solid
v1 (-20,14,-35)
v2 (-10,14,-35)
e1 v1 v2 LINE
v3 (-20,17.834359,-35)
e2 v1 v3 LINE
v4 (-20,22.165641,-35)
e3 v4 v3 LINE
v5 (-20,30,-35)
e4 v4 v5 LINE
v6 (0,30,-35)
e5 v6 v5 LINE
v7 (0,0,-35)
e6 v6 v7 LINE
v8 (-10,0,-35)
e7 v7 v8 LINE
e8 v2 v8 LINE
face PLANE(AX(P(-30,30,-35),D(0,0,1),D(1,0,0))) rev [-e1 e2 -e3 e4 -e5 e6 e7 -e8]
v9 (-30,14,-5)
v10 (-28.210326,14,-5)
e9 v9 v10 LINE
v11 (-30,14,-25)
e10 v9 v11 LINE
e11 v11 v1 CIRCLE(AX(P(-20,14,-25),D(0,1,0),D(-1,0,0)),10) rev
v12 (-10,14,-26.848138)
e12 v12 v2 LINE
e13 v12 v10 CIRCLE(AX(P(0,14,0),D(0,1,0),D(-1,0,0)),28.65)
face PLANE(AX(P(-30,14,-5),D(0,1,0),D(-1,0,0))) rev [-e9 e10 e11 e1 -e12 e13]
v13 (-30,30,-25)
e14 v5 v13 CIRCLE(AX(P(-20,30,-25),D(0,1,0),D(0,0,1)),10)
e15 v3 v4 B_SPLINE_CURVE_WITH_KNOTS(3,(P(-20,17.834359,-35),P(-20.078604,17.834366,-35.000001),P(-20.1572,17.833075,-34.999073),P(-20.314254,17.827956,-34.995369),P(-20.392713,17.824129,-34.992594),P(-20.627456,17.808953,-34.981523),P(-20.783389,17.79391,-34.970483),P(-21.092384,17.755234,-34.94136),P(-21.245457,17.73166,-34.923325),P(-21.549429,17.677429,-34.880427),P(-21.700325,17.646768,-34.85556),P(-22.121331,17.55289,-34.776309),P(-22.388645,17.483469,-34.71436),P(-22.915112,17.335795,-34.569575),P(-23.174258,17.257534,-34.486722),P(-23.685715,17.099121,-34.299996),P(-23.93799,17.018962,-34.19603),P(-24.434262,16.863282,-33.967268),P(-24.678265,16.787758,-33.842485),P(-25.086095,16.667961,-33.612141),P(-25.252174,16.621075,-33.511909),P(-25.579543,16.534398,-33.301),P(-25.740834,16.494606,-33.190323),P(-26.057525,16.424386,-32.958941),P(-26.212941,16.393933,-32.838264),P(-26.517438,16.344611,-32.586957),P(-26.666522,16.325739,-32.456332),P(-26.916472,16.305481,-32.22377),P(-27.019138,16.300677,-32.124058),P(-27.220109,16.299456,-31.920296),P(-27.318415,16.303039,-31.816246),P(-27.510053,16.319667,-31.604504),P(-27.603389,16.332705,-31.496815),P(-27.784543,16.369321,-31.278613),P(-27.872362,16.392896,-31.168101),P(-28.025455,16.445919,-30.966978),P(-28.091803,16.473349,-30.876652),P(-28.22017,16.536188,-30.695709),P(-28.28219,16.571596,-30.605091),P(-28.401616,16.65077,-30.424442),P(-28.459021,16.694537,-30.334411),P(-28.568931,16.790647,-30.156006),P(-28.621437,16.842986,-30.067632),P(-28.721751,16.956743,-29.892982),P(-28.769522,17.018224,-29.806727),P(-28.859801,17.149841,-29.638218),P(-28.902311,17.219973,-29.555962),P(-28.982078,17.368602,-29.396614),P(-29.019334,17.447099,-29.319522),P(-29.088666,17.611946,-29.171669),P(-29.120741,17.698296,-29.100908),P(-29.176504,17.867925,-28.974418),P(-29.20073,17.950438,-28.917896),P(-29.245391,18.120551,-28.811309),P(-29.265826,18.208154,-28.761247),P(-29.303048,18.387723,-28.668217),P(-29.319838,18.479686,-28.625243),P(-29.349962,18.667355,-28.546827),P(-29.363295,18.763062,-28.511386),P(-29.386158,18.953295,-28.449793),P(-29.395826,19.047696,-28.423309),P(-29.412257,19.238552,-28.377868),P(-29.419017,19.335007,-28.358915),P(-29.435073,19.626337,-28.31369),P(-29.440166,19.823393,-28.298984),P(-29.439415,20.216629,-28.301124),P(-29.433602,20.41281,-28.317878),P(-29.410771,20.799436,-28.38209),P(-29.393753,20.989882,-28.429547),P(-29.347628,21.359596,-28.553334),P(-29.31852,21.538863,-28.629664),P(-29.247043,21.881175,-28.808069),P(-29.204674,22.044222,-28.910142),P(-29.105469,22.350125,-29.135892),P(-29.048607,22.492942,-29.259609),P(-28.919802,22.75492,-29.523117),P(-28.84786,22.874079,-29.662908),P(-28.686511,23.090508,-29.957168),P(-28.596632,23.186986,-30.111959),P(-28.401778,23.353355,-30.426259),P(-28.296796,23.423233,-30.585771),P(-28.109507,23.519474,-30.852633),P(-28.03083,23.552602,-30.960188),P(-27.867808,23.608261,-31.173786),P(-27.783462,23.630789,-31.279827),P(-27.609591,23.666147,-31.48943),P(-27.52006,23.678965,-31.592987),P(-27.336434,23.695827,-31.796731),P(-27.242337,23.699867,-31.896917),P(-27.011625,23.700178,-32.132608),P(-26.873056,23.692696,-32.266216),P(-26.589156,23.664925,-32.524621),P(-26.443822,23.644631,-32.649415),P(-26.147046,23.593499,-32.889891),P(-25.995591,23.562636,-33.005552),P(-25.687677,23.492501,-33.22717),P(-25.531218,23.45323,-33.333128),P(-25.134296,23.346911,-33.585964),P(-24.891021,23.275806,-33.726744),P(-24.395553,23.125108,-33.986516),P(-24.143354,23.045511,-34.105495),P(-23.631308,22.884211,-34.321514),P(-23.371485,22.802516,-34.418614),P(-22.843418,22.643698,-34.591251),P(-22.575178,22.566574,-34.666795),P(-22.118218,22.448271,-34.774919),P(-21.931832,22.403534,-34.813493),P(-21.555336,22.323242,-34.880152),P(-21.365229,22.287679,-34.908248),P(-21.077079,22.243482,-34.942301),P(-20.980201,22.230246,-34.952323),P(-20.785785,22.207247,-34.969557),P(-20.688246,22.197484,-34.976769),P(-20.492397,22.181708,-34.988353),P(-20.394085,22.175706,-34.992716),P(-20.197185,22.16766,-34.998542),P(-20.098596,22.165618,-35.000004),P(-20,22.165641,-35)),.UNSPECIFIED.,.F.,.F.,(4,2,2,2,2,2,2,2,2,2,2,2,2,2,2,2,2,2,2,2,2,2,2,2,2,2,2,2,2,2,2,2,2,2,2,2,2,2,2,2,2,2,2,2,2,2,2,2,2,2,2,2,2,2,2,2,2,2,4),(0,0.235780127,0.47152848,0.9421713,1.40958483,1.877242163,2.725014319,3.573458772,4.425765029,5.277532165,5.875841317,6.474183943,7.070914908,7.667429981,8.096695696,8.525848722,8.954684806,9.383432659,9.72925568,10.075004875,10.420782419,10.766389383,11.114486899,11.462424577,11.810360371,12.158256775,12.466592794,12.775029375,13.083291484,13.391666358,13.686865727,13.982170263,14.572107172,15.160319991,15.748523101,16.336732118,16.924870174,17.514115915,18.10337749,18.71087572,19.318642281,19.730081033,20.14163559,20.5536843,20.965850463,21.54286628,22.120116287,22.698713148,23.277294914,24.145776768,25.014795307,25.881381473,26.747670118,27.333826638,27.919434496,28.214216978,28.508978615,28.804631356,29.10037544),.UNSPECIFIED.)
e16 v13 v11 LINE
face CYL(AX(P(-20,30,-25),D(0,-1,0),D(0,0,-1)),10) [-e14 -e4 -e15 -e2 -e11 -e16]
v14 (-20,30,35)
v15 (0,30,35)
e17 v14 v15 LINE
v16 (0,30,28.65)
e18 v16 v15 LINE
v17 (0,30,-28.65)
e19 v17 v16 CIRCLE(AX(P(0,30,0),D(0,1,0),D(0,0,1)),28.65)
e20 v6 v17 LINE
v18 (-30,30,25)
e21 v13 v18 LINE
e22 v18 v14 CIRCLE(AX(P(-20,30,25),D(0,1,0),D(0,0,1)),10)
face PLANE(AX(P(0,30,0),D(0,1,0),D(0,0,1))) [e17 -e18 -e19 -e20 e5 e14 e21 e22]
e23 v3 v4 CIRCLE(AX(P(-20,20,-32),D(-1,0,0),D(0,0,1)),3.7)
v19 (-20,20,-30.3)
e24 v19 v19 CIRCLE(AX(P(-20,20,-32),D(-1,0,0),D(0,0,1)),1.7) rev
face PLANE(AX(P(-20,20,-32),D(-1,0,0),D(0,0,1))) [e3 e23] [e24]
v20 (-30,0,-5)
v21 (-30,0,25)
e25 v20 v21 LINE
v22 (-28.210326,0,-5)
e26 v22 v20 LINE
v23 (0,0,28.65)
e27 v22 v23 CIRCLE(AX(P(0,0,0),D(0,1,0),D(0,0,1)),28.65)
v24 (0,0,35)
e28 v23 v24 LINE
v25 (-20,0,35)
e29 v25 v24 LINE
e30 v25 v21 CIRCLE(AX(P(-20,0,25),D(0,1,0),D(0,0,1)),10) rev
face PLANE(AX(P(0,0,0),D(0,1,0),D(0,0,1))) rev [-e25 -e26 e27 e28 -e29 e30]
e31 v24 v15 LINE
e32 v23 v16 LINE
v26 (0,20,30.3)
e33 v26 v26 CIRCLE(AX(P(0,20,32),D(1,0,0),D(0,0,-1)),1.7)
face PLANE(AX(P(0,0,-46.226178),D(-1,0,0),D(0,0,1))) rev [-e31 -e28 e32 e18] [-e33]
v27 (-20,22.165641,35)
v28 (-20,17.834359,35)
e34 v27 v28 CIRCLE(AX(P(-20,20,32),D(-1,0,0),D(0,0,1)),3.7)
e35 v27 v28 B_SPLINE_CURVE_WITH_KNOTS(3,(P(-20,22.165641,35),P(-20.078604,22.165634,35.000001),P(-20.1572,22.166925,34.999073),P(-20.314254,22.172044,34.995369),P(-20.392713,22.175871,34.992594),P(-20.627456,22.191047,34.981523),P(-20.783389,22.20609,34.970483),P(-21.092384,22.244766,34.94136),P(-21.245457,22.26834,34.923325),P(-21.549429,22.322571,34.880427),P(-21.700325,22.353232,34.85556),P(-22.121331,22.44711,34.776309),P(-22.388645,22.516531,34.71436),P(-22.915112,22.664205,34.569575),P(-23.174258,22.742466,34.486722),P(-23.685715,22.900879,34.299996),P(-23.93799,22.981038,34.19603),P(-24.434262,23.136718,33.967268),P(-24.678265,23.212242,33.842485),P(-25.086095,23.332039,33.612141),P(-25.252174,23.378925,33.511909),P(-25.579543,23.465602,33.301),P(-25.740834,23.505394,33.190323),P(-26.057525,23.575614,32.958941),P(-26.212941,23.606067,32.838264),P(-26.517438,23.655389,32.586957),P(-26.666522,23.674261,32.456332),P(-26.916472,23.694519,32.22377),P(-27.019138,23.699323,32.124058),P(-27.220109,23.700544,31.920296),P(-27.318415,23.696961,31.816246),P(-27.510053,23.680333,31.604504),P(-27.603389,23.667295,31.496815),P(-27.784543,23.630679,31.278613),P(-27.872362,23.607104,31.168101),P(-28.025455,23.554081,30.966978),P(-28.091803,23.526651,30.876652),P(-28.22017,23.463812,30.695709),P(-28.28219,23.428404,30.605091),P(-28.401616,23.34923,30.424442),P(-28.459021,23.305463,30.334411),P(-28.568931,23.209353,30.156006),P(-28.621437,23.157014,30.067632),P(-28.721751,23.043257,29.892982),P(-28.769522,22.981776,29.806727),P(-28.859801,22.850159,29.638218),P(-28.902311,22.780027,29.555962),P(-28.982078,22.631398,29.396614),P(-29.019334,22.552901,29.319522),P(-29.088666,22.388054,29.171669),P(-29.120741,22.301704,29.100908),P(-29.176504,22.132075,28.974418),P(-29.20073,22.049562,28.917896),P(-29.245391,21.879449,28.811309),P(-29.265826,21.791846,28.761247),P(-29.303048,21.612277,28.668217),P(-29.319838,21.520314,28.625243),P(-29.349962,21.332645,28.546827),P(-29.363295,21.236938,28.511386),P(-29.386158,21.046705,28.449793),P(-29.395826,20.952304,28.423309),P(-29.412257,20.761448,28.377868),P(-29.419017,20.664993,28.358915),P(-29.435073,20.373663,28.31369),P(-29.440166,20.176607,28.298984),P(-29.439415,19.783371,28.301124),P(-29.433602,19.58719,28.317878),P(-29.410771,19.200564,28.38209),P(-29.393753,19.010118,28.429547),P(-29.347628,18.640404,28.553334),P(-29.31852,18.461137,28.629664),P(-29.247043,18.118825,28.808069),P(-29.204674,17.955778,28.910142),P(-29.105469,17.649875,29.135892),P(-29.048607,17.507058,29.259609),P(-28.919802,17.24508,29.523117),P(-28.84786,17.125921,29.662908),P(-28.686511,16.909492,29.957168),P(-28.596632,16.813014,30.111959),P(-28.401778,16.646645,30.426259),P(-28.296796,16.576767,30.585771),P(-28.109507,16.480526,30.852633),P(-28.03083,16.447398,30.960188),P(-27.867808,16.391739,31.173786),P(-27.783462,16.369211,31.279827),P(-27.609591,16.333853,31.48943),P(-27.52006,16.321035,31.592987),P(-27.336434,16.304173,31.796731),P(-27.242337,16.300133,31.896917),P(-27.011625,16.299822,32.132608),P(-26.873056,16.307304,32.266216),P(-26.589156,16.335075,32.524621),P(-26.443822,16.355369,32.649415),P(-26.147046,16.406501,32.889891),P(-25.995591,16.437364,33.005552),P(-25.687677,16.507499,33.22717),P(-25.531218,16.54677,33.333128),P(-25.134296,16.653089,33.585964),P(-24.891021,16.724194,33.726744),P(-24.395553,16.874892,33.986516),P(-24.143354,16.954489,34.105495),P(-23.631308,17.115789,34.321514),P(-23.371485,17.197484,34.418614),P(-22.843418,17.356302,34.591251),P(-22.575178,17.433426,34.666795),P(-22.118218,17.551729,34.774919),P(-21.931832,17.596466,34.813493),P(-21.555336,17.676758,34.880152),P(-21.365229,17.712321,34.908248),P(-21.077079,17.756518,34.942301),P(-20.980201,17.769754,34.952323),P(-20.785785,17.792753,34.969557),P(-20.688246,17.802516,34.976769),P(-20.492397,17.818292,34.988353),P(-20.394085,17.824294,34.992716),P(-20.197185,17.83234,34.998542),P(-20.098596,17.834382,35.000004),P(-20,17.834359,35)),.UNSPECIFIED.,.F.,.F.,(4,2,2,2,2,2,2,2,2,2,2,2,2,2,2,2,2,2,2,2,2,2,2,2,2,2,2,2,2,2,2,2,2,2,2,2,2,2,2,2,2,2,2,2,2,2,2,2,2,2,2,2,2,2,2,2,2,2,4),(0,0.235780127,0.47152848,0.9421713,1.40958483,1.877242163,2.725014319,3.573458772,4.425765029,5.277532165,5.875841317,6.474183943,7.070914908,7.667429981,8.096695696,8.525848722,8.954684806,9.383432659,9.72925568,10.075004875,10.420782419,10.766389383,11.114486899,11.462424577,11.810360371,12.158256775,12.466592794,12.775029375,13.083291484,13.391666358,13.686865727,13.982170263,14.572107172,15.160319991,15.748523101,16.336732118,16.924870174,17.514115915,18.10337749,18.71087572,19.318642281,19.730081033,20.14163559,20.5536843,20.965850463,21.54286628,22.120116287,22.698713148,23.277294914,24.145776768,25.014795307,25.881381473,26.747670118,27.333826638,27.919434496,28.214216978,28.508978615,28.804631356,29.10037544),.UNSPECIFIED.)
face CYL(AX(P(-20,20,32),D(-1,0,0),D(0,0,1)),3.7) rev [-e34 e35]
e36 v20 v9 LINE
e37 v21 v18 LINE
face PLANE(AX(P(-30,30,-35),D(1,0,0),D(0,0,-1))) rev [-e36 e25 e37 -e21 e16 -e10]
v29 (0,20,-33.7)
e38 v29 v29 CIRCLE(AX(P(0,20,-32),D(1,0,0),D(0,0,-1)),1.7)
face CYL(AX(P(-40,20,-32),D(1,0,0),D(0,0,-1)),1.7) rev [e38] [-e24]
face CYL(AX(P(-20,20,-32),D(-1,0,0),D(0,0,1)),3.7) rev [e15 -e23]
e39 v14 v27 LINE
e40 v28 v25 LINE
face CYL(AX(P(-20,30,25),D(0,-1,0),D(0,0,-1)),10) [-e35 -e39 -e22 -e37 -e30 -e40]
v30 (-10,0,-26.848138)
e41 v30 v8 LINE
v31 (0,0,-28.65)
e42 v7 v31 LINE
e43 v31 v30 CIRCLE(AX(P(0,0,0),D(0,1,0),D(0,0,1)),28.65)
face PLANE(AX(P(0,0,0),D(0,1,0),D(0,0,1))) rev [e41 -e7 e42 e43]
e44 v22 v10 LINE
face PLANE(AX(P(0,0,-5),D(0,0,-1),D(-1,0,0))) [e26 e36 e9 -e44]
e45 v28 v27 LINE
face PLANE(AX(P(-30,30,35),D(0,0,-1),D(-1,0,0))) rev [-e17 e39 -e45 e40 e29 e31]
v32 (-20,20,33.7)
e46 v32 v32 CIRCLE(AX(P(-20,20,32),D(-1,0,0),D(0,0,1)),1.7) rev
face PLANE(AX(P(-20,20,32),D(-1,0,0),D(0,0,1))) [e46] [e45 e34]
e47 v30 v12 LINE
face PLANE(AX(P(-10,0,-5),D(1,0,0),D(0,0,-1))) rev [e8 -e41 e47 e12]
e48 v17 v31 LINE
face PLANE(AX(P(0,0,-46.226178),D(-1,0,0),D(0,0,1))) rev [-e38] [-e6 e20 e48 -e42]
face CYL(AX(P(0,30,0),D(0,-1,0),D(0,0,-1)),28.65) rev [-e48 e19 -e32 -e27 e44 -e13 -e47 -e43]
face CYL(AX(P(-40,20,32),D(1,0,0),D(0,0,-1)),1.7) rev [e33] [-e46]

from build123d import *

# Parameters (mm, degrees)
SKETCH_1_W          = 60
SKETCH_1_H          = 70
SKETCH_1_R          = 28.65
EXTRUDE_1_DEPTH     = 30
SKETCH_2_W          = 76.072381137
SKETCH_2_H          = 88.67236145
CUT_EXTRUDE_1_DEPTH = 30
SKETCH_3_R          = 1.7
CUT_EXTRUDE_2_DEPTH = 40
SKETCH_4_W          = 20
SKETCH_4_H          = 14
CUT_EXTRUDE_3_DEPTH = 30
SKETCH_5_R          = 3.7
CUT_EXTRUDE_4_DEPTH = 10
FILLET_1_DEPTH      = 30


with BuildPart() as part:
    # 草图1 → 凸台-拉伸1 (new body)
    with BuildSketch(Plane(origin=(0, 0, 0), x_dir=(1, 0, 0), z_dir=(0, 1, 0))):
        Rectangle(SKETCH_1_W, SKETCH_1_H)
        with Locations(Location((0, 0, 0), (0, 0, 270))):
            Circle(SKETCH_1_R, mode=Mode.SUBTRACT)
    extrude(amount=EXTRUDE_1_DEPTH)

    # 草图2 → 切除-拉伸1 (cut)
    with BuildSketch(Plane(origin=(0, 30, 0), x_dir=(1, 0, 0), z_dir=(0, 1, 0))):
        with Locations((38.036190569, 1.889997047)):
            Rectangle(SKETCH_2_W, SKETCH_2_H)
    extrude(amount=-CUT_EXTRUDE_1_DEPTH, mode=Mode.SUBTRACT)

    # 草图3 → 切除-拉伸2 (cut)
    with BuildSketch(Plane(origin=(0, 0, 0), x_dir=(0, 0, -1), z_dir=(1, 0, 0))):
        with Locations((32, 20)):
            Circle(SKETCH_3_R)
        with Locations((-32, 20)):
            Circle(SKETCH_3_R)
    extrude(amount=-CUT_EXTRUDE_2_DEPTH, mode=Mode.SUBTRACT)

    # 草图4 → 切除-拉伸3 (cut)
    with BuildSketch(Plane(origin=(0, 0, -35), x_dir=(-1, 0, 0), z_dir=(0, 0, -1))):
        with Locations((20, 7)):
            Rectangle(SKETCH_4_W, SKETCH_4_H)
    extrude(amount=-CUT_EXTRUDE_3_DEPTH, mode=Mode.SUBTRACT)

    # 草图5 → 切除-拉伸4 (cut)
    with BuildSketch(Plane.ZY.offset(30)):
        with Locations((-32, 20)):
            Circle(SKETCH_5_R)
        with Locations((32, 20)):
            Circle(SKETCH_5_R)
    extrude(amount=-CUT_EXTRUDE_4_DEPTH, mode=Mode.SUBTRACT)

    # 圆角1: read off the stored shape, not the designer's step
    # 圆角1 outline → 圆角1 (cut)
    with BuildSketch(Plane(origin=(0, 0, 0), x_dir=(1, 0, 0), z_dir=(0, 1, 0))):
        with BuildLine():
            Line((-30, -35), (-20, -35))
            ThreePointArc((-20, -35), (-27.071067812, -32.071067812), (-30, -25))
            Line((-30, -25), (-30, -35))
        make_face()
        with BuildLine():
            Line((-30, 35), (-30, 25))
            ThreePointArc((-30, 25), (-27.071067812, 32.071067812), (-20, 35))
            Line((-20, 35), (-30, 35))
        make_face()
    extrude(amount=FILLET_1_DEPTH, mode=Mode.SUBTRACT)


solid = part.part
